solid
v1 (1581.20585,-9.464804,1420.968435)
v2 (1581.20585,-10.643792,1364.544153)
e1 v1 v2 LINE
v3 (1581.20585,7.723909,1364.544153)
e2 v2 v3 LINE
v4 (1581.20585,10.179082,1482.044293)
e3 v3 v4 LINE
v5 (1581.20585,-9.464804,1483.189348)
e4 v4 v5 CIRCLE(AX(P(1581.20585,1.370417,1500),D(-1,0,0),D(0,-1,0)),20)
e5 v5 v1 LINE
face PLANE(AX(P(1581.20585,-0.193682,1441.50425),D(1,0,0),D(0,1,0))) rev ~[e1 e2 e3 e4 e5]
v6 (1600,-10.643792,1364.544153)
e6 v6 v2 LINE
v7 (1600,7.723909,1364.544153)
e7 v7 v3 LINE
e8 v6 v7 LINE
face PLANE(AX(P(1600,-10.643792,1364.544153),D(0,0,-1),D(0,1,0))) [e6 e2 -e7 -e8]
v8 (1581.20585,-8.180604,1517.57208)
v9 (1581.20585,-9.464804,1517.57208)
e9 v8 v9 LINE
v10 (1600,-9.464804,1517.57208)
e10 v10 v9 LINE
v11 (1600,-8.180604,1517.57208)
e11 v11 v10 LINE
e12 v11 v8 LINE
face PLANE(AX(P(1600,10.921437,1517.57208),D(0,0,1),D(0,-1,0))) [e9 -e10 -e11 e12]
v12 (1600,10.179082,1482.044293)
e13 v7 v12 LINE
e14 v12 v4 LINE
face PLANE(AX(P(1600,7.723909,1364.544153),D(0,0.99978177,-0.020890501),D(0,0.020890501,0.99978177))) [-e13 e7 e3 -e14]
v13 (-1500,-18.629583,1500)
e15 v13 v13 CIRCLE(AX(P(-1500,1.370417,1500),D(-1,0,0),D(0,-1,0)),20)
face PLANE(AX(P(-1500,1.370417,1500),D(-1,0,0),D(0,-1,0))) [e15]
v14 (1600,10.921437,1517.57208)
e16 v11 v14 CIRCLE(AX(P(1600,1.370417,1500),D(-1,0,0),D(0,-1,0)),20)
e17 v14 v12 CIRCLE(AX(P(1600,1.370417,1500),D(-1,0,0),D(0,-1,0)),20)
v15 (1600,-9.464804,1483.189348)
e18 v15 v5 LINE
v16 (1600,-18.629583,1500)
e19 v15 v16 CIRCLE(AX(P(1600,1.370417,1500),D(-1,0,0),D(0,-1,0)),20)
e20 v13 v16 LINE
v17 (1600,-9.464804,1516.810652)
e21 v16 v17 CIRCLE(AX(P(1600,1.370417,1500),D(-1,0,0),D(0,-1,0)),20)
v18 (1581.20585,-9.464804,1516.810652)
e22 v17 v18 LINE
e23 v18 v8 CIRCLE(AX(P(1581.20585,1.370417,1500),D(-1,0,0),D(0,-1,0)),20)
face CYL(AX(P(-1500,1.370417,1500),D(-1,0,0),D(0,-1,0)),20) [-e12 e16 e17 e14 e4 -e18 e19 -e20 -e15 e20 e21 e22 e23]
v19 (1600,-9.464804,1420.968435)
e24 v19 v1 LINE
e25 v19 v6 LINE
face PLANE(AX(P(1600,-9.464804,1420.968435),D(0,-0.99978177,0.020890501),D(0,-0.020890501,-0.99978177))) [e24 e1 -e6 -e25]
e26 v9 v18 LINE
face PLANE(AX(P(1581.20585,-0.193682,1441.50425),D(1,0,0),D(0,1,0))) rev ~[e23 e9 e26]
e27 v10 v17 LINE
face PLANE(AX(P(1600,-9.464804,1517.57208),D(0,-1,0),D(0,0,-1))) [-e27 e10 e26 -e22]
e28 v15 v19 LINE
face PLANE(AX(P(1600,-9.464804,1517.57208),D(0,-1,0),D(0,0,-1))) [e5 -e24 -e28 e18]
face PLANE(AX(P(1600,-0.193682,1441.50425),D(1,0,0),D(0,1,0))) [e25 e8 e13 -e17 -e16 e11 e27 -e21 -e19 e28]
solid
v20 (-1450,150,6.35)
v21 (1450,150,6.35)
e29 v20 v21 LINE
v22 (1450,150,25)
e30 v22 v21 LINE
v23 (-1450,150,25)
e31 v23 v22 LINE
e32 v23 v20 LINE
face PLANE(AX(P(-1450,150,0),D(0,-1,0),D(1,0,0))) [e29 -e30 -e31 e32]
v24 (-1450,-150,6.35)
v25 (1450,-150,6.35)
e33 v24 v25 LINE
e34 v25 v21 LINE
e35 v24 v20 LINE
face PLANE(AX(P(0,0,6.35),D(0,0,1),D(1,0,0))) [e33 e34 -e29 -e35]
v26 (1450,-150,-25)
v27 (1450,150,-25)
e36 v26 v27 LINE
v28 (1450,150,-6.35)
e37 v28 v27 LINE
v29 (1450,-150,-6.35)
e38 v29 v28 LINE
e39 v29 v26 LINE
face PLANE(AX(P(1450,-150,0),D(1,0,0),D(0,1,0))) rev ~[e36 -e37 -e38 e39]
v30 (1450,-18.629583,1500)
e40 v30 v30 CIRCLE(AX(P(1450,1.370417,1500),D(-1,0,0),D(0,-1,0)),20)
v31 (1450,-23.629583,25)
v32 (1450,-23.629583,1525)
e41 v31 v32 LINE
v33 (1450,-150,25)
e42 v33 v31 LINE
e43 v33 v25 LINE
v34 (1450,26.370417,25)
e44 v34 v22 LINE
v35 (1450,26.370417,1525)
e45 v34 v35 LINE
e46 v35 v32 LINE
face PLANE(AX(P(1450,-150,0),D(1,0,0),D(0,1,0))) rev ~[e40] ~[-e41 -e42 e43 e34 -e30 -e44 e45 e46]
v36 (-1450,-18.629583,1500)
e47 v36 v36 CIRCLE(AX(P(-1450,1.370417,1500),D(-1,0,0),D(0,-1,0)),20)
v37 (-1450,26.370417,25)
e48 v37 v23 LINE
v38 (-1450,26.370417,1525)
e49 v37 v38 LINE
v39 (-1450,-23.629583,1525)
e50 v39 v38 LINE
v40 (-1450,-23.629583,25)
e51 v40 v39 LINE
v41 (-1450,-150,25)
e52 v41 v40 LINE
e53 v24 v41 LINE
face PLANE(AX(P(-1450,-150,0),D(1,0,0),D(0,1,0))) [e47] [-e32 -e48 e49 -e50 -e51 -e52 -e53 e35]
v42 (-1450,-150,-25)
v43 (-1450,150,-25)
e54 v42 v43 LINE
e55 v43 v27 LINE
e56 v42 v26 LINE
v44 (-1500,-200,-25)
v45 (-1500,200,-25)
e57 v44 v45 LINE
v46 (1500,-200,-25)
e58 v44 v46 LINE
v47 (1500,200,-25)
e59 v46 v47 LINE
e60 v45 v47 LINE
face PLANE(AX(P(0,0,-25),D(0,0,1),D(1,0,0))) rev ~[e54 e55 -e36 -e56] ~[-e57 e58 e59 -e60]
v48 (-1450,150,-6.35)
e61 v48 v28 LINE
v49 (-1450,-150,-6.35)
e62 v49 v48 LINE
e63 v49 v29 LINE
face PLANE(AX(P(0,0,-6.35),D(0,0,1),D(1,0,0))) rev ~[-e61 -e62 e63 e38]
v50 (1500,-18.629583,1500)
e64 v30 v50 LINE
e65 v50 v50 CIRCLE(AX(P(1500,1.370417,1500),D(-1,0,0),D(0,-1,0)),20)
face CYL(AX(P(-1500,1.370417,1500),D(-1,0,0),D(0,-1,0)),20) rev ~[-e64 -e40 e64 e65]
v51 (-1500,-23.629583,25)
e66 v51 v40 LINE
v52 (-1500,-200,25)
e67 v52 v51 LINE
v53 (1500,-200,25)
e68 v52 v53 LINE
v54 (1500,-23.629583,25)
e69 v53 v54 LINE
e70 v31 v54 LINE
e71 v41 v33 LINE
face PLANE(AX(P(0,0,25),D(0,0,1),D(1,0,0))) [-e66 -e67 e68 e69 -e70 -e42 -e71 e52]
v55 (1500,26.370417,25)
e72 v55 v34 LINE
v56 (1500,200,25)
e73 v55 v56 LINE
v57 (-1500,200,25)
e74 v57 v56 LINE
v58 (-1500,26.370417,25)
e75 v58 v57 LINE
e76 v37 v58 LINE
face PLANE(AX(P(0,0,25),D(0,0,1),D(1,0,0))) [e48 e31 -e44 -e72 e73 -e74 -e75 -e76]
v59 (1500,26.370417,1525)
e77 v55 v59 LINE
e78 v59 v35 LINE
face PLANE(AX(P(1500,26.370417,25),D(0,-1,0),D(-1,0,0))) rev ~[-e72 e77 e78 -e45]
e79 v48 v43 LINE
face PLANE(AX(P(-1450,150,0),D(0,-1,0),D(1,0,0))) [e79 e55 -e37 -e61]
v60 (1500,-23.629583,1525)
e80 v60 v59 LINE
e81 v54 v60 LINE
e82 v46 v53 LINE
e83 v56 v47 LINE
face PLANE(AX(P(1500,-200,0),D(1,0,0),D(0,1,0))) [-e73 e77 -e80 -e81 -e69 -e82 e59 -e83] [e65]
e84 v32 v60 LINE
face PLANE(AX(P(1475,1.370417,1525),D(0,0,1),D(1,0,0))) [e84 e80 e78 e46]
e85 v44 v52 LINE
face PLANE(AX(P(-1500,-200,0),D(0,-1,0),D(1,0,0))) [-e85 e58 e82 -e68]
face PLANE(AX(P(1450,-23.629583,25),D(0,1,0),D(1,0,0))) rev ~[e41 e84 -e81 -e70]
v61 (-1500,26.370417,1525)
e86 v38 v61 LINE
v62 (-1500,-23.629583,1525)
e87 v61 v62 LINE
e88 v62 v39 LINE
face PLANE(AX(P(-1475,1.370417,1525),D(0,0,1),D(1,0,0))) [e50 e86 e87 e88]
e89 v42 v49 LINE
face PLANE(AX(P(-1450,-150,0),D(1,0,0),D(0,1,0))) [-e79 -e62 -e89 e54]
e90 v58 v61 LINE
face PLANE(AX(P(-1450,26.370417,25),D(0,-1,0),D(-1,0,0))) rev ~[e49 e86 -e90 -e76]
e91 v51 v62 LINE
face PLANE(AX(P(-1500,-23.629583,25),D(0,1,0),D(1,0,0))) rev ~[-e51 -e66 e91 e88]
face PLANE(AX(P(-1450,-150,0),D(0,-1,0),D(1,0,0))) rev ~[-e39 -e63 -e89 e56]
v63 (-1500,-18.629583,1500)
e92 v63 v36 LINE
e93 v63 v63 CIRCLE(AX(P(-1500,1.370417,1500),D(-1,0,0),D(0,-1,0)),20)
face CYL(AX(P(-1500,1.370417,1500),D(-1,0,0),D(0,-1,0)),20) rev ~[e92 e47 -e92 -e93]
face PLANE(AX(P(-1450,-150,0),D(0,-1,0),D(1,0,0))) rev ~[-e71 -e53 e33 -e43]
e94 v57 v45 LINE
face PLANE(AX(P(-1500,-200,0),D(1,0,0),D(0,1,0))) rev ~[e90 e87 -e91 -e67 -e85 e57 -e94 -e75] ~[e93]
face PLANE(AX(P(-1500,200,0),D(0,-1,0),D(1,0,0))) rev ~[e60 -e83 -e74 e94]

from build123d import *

# Parameters (mm, degrees)
F0_W      = 3000
F0_H      = 400
F0_W_2    = 2900
F0_H_2    = 300
F1_DEPTH  = 25
F3_DEPTH  = 1500
F4_R      = 20
F5_DEPTH  = 3064.82128
F6_R      = 20
F7_DEPTH  = 3100
F9_DEPTH  = 18.79415
F12_DEPTH = 6.35


# Not quite as in the source:
# - a feature names something its author has since deleted; it is built from what else it names
# - the program builds the solid bodies; features that only make, move or delete a surface that nothing else refers to are left out


with BuildPart() as f1:
    # F0 (on Top) → F1 (new body, symmetric)
    with BuildSketch(Plane.XY):
        Rectangle(F0_W, F0_H)
        Rectangle(F0_W_2, F0_H_2, mode=Mode.SUBTRACT)
    extrude(amount=F1_DEPTH, both=True)

    # F2 (on face) → F3 (join)
    with BuildSketch(Plane.XY.offset(25)):
        Polygon((-1500, 26.3704165816), (-1500, 0), (-1500, -23.6295834184), (-1450, -23.6295834184), (-1450, 26.3704165816), align=None)
        Polygon((1500, -23.6295834184), (1500, 0), (1500, 26.3704165816), (1450, 26.3704165816), (1450, -23.6295834184), align=None)
    extrude(amount=F3_DEPTH)

    # F4 (on face) → F5 (cut)
    with BuildSketch(Plane(origin=(-1500, 0, 0), x_dir=(0, -1, 0), z_dir=(-1, 0, 0))):
        with Locations((-1.3704165816, 1500)):
            Circle(F4_R)
    extrude(amount=-F5_DEPTH, mode=Mode.SUBTRACT)

    # F0 (on Top) → F12 (join, symmetric)
    with BuildSketch(Plane.XY):
        Rectangle(F0_W_2, F0_H_2)
    extrude(amount=F12_DEPTH, both=True)


with BuildPart() as f7:
    # F6 (on face) → F7 (new body)
    with BuildSketch(Plane(origin=(-1500, 0, 0), x_dir=(0, -1, 0), z_dir=(-1, 0, 0))):
        with Locations((-1.3704165816, 1500)):
            Circle(F6_R)
    extrude(amount=-F7_DEPTH)

    # F8 (on face) → F9 (join)
    with BuildSketch(Plane.YZ.offset(1600)):
        Polygon((-9.4648035193, 1420.9684346451), (-10.6437923387, 1364.5441532135), (7.7239090577, 1364.5441532135), (10.9214369768, 1517.5720803951), (-9.4648035193, 1517.5720803951), align=None)
    extrude(amount=-F9_DEPTH)


solid = Compound([f1.part, f7.part])
